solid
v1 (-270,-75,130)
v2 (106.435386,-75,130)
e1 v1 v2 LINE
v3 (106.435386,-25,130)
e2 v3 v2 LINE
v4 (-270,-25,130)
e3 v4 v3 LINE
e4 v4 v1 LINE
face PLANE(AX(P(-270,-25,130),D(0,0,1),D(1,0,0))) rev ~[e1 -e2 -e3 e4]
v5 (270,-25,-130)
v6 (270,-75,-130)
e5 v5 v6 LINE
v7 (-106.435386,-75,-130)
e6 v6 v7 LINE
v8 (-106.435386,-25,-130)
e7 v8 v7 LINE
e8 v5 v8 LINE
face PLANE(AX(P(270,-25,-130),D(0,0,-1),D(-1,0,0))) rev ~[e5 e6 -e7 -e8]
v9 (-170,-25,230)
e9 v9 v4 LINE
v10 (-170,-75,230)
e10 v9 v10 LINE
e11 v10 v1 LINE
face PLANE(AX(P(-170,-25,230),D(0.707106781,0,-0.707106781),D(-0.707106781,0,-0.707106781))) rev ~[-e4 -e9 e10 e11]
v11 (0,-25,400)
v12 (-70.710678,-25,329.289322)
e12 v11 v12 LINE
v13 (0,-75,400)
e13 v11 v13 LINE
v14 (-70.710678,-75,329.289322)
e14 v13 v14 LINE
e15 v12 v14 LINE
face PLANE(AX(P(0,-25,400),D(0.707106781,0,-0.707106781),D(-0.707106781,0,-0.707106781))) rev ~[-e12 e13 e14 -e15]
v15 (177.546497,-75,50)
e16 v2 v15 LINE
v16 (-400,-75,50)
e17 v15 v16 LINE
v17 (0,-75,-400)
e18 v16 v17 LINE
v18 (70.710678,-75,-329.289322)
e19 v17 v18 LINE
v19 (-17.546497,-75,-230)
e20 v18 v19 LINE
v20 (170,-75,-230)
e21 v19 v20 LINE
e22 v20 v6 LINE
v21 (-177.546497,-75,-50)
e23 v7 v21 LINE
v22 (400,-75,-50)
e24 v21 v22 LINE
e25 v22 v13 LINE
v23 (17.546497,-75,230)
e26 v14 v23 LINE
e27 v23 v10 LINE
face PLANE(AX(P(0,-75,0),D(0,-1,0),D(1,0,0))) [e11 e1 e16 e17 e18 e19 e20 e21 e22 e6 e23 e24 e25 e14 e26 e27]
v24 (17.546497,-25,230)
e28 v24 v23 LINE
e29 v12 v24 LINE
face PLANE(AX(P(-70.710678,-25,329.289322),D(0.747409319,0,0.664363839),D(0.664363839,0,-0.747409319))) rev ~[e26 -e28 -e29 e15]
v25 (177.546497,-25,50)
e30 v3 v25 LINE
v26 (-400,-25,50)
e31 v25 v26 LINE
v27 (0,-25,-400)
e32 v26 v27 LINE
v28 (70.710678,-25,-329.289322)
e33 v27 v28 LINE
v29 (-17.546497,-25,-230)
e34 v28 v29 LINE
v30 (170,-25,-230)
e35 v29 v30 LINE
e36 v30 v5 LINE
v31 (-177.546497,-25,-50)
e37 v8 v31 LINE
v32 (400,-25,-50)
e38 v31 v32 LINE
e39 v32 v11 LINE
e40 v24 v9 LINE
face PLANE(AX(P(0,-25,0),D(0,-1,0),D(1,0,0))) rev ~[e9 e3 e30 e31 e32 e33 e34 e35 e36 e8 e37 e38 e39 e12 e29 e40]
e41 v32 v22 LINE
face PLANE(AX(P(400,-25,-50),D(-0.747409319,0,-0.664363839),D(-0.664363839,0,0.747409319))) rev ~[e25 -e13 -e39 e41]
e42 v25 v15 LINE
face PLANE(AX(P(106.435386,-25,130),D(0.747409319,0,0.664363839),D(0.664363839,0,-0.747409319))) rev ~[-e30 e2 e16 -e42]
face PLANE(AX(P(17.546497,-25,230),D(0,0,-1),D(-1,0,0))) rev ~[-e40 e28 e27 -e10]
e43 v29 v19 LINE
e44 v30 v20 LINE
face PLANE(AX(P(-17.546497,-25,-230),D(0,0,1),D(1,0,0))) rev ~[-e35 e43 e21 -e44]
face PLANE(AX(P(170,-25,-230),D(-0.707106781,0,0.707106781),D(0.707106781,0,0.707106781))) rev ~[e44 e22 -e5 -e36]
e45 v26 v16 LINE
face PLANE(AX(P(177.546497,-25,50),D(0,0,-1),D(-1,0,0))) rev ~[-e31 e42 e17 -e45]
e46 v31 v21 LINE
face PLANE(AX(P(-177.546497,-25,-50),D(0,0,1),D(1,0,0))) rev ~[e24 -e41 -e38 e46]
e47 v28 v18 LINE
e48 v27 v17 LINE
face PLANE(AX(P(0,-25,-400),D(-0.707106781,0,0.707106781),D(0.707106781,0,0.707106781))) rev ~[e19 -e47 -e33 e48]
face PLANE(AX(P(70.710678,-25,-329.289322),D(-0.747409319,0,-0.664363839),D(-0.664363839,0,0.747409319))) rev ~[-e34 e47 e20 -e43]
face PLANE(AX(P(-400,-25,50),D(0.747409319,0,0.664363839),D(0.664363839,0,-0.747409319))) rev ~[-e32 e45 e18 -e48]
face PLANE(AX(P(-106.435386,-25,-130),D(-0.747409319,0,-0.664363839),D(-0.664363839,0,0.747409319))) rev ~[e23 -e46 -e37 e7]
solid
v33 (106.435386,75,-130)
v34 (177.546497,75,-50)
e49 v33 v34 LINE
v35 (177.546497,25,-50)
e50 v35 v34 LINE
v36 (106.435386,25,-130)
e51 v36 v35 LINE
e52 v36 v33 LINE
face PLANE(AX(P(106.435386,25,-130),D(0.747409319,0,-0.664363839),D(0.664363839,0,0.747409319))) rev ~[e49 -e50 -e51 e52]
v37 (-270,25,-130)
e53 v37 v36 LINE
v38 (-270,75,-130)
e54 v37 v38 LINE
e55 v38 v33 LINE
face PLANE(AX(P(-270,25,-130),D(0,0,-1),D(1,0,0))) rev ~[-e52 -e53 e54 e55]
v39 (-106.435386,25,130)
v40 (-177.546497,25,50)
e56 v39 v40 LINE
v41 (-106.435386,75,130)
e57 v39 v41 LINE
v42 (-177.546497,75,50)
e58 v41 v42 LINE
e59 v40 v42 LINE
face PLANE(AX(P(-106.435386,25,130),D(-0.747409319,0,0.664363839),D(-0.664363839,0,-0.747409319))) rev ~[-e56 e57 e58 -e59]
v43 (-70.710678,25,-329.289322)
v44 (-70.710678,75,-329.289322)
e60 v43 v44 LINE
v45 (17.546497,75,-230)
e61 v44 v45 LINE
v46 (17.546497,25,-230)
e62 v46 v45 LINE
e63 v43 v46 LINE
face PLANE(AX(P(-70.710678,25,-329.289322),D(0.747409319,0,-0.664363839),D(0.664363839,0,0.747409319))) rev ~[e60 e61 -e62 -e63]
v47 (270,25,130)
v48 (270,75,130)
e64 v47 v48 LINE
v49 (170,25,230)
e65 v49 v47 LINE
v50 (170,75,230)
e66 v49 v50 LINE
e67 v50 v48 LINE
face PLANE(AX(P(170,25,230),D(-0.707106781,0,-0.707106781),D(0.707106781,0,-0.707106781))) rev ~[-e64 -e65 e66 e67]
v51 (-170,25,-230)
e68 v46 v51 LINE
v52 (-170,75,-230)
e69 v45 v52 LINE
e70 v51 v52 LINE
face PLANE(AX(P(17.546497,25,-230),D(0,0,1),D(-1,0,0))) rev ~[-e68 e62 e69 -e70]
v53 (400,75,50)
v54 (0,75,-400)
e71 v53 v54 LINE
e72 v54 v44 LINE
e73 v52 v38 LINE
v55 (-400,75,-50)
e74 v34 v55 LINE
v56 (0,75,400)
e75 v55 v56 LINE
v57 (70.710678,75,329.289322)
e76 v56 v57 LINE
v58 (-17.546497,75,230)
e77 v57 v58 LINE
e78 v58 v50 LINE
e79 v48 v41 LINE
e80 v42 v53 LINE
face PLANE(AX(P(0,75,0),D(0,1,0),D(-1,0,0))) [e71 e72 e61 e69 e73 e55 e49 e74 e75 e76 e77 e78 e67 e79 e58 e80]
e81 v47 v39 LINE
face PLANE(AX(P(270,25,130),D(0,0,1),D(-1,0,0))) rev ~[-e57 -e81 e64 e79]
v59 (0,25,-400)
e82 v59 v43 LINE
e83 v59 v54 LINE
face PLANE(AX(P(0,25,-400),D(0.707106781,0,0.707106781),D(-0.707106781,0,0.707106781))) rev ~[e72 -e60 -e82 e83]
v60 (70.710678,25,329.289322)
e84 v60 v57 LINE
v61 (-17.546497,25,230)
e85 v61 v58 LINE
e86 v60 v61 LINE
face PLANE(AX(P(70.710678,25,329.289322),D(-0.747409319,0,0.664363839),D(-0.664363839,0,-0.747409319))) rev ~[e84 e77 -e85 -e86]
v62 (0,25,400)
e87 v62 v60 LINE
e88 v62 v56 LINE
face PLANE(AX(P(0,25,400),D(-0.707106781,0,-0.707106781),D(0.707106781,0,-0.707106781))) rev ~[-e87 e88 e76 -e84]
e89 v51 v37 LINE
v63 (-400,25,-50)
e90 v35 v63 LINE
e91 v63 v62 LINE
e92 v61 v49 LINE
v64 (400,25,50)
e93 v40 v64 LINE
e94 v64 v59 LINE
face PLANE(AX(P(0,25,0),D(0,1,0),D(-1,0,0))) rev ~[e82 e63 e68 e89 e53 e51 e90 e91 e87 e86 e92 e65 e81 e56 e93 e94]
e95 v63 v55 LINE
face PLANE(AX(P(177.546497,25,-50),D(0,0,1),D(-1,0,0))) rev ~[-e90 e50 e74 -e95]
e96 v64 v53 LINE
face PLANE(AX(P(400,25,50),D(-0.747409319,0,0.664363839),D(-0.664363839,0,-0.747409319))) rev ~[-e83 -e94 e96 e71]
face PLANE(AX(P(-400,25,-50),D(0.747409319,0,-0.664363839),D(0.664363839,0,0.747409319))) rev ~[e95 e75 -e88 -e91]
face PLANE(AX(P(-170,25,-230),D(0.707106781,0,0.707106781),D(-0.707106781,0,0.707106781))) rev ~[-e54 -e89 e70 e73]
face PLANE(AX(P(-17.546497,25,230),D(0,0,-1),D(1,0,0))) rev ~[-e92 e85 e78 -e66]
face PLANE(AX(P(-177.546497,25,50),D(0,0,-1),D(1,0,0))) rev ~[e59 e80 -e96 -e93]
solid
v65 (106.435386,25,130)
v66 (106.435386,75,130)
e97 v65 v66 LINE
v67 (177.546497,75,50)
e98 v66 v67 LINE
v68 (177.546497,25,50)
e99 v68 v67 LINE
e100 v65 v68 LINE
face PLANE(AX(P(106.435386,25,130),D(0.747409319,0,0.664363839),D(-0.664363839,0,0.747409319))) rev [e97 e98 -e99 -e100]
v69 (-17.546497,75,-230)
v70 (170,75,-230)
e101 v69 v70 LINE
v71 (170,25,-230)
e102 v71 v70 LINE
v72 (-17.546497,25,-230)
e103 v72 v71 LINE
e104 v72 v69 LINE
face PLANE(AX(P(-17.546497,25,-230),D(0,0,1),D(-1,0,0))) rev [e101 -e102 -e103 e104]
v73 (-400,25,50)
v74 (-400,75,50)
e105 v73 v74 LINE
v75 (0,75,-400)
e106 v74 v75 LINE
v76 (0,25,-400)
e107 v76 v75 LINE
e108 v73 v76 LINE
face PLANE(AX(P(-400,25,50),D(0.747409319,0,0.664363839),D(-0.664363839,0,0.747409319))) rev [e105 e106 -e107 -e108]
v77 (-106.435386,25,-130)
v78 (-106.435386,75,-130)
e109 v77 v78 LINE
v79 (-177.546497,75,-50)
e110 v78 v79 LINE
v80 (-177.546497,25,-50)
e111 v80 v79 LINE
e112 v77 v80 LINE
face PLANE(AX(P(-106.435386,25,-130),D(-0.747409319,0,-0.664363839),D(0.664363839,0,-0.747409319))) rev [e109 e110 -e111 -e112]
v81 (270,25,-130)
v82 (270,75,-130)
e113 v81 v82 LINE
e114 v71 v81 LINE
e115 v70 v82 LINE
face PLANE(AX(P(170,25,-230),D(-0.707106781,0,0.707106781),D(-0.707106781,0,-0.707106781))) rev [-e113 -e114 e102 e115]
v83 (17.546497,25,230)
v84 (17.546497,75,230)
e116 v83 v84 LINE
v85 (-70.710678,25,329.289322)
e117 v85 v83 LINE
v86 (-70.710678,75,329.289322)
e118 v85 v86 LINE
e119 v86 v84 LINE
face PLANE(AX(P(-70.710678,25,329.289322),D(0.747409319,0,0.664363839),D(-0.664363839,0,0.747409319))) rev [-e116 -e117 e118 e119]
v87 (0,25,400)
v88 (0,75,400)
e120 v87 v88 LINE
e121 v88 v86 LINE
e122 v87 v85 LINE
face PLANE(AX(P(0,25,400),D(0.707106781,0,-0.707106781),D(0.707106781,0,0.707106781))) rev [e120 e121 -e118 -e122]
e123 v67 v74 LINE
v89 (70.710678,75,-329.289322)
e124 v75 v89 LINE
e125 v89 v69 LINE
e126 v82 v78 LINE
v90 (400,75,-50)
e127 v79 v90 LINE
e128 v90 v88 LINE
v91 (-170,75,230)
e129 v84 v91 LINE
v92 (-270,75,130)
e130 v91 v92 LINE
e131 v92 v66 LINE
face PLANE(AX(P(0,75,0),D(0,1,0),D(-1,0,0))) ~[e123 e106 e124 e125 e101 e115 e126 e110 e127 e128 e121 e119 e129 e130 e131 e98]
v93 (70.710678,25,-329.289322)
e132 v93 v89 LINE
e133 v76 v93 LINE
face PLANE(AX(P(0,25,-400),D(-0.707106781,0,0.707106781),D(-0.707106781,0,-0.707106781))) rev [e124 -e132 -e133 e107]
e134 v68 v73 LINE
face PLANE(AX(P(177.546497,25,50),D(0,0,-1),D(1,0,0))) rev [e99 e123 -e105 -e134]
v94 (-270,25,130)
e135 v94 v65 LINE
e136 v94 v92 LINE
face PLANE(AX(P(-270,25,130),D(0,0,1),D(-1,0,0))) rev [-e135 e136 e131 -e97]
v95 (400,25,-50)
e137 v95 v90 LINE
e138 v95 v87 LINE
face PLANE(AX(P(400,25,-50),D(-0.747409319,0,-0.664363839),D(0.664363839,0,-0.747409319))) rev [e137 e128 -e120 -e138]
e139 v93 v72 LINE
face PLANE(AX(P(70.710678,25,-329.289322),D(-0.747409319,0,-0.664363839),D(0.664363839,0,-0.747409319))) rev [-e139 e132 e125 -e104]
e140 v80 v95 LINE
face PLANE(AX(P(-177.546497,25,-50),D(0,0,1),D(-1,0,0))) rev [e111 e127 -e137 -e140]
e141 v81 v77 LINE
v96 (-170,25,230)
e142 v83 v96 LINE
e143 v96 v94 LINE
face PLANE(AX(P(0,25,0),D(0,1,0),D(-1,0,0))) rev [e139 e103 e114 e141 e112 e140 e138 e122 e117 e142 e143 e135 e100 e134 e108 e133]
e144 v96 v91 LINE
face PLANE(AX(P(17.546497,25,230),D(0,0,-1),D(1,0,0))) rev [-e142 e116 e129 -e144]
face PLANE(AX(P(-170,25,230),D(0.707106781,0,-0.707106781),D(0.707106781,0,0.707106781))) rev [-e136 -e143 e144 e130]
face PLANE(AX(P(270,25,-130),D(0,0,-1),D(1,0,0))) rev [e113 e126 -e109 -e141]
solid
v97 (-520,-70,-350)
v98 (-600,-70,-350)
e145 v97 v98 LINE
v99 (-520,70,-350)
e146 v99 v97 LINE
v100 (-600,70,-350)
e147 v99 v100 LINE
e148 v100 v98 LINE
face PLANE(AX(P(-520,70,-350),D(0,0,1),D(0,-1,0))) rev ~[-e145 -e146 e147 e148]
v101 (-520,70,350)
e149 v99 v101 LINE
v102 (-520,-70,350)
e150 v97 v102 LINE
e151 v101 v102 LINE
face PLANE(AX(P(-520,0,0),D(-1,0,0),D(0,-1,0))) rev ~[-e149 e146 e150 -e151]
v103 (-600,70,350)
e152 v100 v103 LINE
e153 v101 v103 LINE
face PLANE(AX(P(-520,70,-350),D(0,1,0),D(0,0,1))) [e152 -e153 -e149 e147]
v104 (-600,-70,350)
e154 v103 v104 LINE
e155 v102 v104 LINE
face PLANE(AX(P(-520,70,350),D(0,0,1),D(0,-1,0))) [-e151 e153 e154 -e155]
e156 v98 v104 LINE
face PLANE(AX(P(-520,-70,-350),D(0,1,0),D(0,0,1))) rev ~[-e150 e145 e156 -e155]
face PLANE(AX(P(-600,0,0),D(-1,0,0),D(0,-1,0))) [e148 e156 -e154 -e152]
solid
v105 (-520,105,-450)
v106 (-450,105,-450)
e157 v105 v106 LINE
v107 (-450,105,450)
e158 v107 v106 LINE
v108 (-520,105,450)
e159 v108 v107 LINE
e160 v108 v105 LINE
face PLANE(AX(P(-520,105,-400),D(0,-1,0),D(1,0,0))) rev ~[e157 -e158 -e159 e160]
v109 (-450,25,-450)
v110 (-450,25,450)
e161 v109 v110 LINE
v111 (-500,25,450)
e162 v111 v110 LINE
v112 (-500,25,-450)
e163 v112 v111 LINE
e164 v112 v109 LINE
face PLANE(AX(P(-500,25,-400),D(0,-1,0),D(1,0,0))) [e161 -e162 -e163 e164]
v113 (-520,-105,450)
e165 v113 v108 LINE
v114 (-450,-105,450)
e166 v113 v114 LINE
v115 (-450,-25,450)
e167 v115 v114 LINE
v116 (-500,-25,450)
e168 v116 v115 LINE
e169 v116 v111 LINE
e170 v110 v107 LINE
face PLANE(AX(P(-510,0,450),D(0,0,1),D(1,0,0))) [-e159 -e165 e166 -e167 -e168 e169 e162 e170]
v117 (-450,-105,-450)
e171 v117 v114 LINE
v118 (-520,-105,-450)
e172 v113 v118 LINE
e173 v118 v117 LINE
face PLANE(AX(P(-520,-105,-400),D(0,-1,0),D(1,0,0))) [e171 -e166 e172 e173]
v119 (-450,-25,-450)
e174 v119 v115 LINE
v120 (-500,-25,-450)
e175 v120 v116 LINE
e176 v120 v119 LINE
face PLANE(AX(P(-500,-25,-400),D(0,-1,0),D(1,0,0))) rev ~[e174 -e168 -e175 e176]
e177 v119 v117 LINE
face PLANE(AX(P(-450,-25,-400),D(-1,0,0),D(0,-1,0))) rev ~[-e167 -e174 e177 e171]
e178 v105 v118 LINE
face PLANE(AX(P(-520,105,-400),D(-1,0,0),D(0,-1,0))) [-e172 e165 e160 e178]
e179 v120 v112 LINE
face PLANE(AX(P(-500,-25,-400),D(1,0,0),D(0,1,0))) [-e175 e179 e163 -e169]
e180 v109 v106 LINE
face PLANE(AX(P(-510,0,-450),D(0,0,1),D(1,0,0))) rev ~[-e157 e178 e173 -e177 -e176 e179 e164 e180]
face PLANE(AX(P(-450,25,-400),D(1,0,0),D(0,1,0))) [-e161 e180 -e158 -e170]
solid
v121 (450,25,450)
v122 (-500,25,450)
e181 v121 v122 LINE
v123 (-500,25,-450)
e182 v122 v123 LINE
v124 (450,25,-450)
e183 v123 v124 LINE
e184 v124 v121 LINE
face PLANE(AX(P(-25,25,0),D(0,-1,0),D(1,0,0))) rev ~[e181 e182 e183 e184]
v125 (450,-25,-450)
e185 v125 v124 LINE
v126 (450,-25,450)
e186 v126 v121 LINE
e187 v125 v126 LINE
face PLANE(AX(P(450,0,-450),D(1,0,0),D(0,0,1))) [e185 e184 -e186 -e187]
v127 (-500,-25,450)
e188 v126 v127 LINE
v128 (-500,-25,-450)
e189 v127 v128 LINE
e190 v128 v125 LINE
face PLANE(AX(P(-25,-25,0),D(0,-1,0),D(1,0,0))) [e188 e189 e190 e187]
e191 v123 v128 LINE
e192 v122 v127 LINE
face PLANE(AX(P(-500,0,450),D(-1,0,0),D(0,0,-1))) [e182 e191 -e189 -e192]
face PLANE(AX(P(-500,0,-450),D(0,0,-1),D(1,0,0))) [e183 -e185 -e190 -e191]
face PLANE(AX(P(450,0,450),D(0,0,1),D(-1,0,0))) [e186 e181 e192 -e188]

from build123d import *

# Parameters (mm, degrees)
F1_DEPTH  = 25
F2_W      = 70
F2_H      = 800
F3_DEPTH  = 80
F5_W      = 20
F5_H      = 50
F6_DEPTH  = 800
F8_DEPTH  = 50
F11_W     = 140
F11_H     = 700
F12_DEPTH = 80
F13_DEPTH = 50
F14_DEPTH = 50


with BuildPart() as f1:
    # F0 (on Front) → F1 (new body, symmetric)
    with BuildSketch(Plane.XZ):
        Polygon((450, 450), (-450, 450), (-500, 450), (-500, -450), (-450, -450), (450, -450), align=None)
    extrude(amount=F1_DEPTH, both=True)


with BuildPart() as f3:
    # F2 (on face) → F3 (new body)
    with BuildSketch(Plane.XZ.offset(25)):
        with Locations((-485, 0)):
            Rectangle(F2_W, F2_H)
    extrude(amount=F3_DEPTH)


with BuildPart() as f4_1:
    # F4: instance of F3
    add(f3.part.mirror(Plane.XZ))


with BuildPart() as f3_1:
    add(f3.part)

    add(f4_1.part)  # F6 merges F4_1
    # F5 (on face) → F6 (join, through all)
    with BuildSketch(Plane.XY.offset(400)):
        with Locations((-510, 0)):
            Rectangle(F5_W, F5_H)
    extrude(amount=-F6_DEPTH)

    # F13 (add, through all): a face of the model
    f13_faces = [f3_1.faces().sort_by_distance(p)[0] for p in [
        (-452.2135943621, 65, 400),
    ]]
    extrude(f13_faces, amount=F13_DEPTH)

    # F14 (add, through all): a face of the model
    f14_faces = [f3_1.faces().sort_by_distance(p)[0] for p in [
        (-517.7864056379, 0, -400),
    ]]
    extrude(f14_faces, amount=F14_DEPTH)


with BuildPart() as f8:
    # F7 (on face) → F8 (new body)
    with BuildSketch(Plane.XZ.offset(25)):
        Polygon((-400, 50), (0, -400), (70.7106781187, -329.2893218813), (-17.546496887, -230), (170, -230), (270, -130), (-106.4353857759, -130), (-177.546496887, -50), (400, -50), (0, 400), (-70.7106781187, 329.2893218813), (17.546496887, 230), (-170, 230), (-270, 130), (106.4353857759, 130), (177.546496887, 50), align=None)
    extrude(amount=F8_DEPTH)


with BuildPart() as f9_1:
    # F9: instance of F8
    add(f8.part.mirror(Plane.XZ))


with BuildPart() as f10_1:
    # F10: instance of F9_1
    add(f9_1.part.mirror(Plane.YZ))


with BuildPart() as f12:
    # F11 (on face) → F12 (new body)
    with BuildSketch(Plane(origin=(-520, 0, 0), x_dir=(0, -1, 0), z_dir=(-1, 0, 0))):
        Rectangle(F11_W, F11_H)
    extrude(amount=F12_DEPTH)


solid = Compound([f1.part, f3_1.part, f8.part, f9_1.part, f10_1.part, f12.part])
